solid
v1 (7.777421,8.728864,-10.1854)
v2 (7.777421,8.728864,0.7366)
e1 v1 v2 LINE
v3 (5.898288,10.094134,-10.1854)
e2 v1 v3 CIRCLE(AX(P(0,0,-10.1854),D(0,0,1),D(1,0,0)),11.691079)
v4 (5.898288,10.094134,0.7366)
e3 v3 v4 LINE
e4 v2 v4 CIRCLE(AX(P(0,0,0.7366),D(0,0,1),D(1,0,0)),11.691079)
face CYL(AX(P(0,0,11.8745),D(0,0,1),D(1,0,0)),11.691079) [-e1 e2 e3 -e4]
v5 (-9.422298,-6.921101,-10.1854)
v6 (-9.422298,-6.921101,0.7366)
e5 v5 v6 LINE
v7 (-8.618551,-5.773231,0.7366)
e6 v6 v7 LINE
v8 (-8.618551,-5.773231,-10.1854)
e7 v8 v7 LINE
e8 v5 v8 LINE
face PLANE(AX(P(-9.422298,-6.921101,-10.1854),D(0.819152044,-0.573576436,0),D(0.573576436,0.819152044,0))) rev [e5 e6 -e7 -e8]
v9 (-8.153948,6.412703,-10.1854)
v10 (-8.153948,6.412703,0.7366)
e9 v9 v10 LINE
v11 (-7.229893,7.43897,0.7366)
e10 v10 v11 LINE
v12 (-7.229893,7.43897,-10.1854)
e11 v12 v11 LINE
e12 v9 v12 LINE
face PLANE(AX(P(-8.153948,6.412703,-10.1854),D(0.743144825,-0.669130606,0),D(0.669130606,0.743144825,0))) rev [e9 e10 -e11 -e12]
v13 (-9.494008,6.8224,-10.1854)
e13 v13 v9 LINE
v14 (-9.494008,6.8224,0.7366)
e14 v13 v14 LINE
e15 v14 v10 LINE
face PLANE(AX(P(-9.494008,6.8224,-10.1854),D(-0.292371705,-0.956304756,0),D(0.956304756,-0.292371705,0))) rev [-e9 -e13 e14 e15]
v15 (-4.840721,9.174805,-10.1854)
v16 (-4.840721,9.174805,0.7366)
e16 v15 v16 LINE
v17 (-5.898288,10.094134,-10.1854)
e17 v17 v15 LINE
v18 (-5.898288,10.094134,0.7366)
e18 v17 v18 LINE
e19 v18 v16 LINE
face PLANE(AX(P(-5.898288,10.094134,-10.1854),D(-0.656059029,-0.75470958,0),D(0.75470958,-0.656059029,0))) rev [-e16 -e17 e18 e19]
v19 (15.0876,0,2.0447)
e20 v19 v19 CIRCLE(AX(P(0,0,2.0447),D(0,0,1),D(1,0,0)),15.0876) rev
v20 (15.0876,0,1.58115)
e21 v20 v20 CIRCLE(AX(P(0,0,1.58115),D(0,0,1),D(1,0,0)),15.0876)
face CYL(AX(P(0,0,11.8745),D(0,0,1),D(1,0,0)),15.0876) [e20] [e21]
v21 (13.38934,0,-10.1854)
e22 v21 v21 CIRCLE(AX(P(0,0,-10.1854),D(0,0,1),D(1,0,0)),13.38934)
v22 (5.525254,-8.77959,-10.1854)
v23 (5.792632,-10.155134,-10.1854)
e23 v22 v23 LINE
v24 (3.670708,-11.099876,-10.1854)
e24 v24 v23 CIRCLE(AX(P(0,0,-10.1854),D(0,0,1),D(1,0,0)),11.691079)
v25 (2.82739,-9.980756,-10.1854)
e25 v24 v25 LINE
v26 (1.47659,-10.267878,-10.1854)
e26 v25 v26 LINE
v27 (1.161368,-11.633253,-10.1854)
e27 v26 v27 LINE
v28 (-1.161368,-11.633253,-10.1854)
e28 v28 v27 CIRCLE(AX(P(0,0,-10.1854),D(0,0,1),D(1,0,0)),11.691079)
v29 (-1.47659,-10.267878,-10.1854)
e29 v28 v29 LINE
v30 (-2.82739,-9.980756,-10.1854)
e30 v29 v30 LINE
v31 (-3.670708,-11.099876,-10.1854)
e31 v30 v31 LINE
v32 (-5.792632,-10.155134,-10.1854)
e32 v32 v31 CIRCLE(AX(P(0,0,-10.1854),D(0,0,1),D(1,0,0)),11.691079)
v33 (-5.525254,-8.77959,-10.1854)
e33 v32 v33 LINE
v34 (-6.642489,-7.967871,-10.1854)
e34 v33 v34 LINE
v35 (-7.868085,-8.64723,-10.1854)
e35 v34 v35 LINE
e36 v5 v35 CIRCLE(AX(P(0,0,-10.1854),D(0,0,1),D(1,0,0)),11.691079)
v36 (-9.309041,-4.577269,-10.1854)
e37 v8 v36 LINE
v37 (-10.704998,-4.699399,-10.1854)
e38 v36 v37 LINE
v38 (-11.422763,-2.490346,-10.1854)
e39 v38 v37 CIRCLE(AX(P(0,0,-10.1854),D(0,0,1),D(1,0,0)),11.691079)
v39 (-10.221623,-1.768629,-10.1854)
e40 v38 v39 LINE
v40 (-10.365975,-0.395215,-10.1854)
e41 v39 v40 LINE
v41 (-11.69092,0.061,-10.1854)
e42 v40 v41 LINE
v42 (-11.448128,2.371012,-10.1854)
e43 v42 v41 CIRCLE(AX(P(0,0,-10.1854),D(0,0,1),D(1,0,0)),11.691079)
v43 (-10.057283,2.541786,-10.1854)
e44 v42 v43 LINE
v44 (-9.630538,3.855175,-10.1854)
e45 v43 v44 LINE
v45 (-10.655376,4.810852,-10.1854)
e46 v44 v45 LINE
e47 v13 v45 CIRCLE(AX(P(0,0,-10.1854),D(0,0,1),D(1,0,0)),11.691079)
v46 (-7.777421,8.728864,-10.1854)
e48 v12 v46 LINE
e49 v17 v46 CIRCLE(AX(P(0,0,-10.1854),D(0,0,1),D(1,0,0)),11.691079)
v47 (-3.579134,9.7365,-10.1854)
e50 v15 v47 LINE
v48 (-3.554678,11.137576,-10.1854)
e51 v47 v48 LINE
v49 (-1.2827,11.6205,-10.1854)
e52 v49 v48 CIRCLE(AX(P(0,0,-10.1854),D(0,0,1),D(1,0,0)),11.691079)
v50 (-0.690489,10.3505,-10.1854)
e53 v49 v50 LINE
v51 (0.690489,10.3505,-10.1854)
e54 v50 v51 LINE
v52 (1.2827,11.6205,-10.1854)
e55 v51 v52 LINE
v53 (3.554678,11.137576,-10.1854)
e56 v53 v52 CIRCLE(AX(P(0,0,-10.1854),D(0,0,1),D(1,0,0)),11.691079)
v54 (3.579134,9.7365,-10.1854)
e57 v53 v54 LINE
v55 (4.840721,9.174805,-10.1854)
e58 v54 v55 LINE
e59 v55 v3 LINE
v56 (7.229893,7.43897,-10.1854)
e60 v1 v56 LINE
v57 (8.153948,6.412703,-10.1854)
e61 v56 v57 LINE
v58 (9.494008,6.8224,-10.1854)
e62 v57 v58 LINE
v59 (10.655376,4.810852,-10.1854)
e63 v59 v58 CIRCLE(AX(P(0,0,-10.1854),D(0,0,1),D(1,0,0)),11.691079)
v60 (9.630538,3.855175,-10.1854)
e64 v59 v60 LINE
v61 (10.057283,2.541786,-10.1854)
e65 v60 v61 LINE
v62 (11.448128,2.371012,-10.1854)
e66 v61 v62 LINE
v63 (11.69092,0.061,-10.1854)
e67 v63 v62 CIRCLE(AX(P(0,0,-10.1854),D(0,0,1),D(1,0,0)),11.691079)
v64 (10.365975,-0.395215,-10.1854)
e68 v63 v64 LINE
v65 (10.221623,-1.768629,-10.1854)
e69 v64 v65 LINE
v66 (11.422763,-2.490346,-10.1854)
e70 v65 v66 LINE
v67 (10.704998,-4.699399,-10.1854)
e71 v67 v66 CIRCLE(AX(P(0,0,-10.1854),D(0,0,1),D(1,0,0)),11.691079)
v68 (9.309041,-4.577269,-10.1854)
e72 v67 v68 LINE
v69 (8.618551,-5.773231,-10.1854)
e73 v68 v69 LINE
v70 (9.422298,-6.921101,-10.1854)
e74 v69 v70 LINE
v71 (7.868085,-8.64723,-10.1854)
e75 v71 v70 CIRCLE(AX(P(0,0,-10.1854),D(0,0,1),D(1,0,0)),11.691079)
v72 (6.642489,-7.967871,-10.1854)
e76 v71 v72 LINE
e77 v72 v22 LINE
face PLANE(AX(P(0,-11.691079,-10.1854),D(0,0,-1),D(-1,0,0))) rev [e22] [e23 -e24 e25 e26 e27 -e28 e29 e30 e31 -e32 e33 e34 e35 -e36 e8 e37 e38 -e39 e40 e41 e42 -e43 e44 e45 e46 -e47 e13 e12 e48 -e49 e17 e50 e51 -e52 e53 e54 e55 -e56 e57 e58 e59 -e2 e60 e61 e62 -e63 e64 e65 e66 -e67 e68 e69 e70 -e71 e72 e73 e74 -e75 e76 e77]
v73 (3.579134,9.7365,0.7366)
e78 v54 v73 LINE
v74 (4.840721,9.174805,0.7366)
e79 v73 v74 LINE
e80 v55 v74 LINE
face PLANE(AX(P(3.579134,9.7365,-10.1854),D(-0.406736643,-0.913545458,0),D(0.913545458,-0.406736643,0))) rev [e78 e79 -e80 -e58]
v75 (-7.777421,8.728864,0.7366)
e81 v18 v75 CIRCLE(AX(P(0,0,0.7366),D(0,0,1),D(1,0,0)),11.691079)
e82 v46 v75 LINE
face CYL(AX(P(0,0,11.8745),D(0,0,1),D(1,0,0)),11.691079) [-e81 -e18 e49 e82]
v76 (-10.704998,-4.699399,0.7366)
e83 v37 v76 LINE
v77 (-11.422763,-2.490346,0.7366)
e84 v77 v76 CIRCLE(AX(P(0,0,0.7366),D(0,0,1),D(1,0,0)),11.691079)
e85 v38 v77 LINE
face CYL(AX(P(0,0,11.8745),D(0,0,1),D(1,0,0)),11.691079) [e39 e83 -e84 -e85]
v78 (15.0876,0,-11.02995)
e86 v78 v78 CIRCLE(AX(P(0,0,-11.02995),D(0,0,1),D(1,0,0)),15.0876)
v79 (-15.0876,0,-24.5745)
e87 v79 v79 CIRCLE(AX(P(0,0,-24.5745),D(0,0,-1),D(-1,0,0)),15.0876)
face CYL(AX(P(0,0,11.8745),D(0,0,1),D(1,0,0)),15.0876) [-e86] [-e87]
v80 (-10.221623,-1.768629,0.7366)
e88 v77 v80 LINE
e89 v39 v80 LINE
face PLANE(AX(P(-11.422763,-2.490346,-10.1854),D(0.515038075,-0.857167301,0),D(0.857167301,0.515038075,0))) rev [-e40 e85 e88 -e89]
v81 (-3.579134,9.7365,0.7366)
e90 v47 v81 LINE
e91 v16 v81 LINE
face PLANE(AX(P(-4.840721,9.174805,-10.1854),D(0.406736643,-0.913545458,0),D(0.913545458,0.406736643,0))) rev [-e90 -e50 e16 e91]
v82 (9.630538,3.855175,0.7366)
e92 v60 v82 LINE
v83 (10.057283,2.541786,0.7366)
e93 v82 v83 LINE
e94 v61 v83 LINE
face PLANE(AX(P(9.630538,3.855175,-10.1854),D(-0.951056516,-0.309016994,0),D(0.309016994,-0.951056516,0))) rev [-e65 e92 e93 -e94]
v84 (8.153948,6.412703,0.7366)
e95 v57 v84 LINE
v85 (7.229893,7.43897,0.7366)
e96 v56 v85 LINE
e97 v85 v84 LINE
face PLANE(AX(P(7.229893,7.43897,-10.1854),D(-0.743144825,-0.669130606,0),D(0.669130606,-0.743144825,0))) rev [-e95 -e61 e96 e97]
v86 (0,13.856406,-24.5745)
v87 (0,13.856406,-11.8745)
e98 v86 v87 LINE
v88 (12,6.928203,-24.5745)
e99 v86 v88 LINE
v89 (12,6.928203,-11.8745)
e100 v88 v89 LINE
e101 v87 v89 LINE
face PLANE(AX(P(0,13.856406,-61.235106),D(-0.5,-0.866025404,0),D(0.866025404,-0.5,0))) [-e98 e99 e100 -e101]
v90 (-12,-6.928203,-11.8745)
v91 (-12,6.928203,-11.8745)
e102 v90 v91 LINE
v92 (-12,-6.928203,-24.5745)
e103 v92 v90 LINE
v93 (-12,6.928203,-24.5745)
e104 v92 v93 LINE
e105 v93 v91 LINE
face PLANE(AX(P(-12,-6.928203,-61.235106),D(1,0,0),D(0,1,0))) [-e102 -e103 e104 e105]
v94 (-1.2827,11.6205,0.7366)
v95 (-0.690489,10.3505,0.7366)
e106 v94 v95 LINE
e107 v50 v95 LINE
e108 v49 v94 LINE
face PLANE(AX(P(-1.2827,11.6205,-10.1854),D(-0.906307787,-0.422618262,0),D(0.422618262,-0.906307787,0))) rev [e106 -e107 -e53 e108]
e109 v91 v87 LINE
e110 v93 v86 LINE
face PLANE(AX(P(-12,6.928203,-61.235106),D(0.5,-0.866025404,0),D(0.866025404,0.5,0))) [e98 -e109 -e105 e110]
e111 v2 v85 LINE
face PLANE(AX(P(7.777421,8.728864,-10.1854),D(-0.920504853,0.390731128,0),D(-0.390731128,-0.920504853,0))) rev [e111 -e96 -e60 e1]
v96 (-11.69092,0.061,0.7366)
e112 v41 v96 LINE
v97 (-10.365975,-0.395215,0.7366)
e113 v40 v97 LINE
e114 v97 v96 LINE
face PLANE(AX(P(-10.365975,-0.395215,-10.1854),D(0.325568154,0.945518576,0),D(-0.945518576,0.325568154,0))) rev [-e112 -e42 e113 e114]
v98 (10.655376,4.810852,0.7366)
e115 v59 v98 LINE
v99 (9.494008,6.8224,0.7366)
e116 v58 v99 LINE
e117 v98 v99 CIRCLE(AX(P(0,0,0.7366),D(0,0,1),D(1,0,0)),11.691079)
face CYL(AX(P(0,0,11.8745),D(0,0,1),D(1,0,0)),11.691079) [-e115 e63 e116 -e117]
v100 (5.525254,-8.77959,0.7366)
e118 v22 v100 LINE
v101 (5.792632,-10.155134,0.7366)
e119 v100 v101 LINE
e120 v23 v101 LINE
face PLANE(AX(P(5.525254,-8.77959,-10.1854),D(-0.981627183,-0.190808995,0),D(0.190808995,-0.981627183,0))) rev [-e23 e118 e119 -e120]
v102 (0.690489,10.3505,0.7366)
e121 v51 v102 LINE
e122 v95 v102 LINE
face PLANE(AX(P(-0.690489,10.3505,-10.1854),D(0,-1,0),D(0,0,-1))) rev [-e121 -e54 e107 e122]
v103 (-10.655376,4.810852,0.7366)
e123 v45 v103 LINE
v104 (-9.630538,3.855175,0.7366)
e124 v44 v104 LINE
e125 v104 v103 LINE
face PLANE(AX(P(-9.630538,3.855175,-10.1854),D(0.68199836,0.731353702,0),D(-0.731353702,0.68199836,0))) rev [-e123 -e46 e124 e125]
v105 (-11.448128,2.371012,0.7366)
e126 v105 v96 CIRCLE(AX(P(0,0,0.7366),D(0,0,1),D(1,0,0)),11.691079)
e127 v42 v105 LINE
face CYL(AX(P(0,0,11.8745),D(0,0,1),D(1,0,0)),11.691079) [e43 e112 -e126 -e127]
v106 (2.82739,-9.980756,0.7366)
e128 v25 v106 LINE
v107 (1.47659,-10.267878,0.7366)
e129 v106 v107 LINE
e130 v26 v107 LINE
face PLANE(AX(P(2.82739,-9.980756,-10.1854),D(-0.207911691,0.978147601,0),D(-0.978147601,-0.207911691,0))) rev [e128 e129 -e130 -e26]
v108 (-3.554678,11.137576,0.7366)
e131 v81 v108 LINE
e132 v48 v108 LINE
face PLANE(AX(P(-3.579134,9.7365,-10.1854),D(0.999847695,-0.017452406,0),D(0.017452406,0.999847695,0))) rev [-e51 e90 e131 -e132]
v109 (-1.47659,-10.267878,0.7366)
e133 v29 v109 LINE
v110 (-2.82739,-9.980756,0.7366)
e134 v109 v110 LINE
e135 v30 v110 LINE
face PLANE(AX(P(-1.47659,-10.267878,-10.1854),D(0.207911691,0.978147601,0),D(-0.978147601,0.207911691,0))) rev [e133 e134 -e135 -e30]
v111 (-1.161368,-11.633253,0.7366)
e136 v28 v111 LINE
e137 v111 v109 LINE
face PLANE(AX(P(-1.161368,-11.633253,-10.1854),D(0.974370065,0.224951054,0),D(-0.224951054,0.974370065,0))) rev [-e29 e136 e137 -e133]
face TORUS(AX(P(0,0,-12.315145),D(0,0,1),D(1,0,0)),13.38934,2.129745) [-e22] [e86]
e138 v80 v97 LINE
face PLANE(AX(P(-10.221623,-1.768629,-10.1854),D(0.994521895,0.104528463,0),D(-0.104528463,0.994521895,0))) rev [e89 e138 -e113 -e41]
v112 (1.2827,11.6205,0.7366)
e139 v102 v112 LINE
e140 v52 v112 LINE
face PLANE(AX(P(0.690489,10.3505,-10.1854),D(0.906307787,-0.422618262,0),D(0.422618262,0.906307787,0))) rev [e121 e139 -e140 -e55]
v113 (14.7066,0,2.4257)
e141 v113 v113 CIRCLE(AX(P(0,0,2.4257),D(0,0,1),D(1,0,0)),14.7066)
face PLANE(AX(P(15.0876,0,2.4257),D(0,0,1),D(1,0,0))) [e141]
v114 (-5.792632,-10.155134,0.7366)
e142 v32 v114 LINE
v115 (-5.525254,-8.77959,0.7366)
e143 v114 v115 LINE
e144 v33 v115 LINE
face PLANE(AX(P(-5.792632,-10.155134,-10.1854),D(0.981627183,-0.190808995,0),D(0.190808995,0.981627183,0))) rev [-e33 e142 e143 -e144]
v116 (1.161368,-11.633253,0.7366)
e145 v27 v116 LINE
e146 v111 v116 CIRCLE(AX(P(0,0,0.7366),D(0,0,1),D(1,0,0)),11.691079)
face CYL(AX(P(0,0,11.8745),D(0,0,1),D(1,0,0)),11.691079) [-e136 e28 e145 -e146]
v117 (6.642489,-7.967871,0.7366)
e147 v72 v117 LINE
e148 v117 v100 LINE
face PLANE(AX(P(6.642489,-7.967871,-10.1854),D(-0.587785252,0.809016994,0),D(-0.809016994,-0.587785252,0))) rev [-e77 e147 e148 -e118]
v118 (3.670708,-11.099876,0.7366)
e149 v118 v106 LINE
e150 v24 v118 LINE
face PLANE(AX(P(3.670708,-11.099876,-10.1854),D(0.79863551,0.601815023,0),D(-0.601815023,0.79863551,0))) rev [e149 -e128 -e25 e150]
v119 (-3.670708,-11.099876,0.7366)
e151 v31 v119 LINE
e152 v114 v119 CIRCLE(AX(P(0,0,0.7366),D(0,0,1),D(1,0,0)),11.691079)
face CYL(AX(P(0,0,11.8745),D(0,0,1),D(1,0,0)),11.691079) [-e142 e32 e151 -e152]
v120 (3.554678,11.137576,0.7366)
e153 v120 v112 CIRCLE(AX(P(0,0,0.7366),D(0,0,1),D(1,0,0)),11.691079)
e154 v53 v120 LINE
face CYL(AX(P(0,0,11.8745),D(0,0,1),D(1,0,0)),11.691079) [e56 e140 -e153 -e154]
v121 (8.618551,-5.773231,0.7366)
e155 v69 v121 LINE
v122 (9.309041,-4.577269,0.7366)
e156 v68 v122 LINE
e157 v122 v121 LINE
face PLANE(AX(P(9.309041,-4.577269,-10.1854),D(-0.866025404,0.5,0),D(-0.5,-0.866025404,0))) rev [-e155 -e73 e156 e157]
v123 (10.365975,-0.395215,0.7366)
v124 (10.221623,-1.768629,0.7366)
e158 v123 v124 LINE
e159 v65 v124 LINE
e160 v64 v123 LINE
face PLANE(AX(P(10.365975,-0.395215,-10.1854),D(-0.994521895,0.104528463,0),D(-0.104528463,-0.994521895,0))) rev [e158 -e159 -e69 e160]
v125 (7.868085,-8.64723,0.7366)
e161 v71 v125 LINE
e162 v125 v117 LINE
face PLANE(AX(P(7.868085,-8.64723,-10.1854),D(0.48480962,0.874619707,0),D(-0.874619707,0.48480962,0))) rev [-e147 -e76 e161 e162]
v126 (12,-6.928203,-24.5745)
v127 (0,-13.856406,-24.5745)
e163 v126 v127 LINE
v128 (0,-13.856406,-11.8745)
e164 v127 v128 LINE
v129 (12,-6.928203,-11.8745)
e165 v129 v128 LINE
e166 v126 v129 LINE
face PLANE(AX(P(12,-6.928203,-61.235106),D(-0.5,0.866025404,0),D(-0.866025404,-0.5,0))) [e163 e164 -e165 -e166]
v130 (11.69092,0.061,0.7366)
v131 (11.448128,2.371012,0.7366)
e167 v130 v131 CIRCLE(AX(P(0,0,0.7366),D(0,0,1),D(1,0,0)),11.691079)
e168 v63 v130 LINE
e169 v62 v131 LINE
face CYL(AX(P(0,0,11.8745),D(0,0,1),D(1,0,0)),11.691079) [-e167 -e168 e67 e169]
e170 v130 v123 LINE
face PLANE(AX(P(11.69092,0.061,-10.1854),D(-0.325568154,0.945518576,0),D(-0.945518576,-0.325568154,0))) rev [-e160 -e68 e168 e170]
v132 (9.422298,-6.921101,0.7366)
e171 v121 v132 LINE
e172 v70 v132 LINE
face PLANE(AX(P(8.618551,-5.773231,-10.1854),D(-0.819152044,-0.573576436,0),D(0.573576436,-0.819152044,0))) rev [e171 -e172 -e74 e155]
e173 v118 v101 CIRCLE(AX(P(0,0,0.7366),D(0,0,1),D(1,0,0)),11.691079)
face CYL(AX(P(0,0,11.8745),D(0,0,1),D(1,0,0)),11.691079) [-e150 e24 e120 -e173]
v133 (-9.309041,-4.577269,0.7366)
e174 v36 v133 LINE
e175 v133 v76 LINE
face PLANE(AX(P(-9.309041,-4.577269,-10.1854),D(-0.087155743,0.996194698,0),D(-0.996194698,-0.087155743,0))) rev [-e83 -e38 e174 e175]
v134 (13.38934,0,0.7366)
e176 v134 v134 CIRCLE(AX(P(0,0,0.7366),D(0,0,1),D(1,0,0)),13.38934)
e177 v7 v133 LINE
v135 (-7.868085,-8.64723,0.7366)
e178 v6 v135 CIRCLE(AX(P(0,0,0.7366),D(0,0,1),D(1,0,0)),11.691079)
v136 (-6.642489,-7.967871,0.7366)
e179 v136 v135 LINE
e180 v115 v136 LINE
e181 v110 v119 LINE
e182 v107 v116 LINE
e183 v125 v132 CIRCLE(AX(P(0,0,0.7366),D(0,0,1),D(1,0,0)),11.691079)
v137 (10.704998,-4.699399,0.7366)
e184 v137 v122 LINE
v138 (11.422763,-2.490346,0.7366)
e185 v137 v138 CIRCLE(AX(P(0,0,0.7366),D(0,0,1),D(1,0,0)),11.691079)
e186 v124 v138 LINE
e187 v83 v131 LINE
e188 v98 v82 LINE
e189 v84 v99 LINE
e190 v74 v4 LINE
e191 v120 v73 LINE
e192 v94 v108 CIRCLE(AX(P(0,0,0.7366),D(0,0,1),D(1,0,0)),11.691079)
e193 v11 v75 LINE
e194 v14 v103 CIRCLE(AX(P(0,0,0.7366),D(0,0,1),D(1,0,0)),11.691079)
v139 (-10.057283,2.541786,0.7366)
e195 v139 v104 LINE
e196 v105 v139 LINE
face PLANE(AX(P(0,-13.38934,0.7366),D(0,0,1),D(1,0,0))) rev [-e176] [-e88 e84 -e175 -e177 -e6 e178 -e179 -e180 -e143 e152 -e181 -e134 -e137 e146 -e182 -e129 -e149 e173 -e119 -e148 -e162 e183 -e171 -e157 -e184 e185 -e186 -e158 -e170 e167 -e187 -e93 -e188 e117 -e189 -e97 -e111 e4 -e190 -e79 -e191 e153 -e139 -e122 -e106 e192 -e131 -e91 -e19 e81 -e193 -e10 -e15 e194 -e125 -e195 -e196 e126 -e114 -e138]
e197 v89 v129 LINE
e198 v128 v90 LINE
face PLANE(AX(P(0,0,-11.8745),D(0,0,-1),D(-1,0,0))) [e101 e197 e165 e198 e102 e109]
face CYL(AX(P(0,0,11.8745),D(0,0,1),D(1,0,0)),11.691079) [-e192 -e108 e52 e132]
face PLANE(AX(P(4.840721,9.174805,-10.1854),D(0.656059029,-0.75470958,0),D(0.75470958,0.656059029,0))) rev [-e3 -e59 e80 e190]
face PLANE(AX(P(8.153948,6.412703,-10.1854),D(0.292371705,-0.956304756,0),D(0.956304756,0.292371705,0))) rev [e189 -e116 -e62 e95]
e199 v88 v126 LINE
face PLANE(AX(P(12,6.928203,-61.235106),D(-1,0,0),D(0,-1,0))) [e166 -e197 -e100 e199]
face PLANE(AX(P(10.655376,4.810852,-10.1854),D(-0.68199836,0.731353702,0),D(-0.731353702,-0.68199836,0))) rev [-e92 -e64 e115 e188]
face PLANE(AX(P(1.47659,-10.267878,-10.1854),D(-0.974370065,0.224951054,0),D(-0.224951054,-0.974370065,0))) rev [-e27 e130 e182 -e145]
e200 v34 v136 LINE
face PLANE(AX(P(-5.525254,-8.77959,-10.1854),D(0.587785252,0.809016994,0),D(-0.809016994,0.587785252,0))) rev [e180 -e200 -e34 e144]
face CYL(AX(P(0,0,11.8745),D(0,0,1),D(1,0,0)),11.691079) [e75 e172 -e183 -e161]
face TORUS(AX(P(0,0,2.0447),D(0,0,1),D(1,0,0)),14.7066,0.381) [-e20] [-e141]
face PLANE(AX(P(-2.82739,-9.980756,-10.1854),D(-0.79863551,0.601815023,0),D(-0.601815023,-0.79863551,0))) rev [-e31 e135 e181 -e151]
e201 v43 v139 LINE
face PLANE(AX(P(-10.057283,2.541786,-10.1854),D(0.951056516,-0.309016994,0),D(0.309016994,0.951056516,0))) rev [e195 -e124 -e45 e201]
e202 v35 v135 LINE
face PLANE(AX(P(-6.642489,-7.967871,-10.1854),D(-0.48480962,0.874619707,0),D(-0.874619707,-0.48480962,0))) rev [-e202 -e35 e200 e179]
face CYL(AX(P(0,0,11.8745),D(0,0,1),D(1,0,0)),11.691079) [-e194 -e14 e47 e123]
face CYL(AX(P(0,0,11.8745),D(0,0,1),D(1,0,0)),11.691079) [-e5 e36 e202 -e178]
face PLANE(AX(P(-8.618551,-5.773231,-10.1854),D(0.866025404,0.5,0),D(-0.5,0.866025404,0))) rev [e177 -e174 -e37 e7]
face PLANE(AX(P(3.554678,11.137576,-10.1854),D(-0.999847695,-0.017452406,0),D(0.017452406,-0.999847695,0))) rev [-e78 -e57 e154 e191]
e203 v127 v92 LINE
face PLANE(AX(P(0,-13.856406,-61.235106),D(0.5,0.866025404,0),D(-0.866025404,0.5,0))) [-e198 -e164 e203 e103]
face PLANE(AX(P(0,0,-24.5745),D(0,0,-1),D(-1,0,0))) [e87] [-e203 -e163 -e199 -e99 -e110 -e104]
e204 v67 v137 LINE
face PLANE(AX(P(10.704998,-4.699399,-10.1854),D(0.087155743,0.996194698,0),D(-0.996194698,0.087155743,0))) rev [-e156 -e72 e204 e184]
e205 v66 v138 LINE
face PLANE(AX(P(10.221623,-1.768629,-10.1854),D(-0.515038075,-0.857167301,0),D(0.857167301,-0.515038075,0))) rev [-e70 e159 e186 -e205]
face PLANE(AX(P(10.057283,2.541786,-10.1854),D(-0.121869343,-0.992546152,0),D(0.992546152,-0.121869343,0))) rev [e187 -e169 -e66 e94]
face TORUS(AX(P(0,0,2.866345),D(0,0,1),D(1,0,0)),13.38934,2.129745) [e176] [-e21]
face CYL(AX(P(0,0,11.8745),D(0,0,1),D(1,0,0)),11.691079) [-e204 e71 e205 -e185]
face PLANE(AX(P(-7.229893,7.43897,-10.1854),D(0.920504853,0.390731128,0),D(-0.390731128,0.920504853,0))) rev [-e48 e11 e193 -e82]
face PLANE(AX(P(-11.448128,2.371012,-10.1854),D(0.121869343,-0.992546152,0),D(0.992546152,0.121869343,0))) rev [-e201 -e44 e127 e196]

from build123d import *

# Parameters (mm, degrees)
CUT_EXTRUDE1_START  = 0.7366
CUT_EXTRUDE1_DEPTH  = 10.922
CIRPATTERN1_COUNT   = 15
FILLET1_R           = 0.381
SKETCH7_R           = 15.0876
BOSS_EXTRUDE1_DEPTH = 12.7
CUT_EXTRUDE3_DEPTH  = 12.7


# Read off the part's stored shape, not the designer's step: Split1
with BuildPart() as part:
    # Sketch2 → Revolve1 (revolve)
    with BuildSketch(Plane(origin=(0, 0, 0), x_dir=(0, 0, -1), z_dir=(1, 0, 0)), mode=Mode.PRIVATE) as revolve1_sk:
        with BuildLine():
            Line((-11.8745, 0), (11.8745, 0))
            Line((11.8745, 0), (11.8745, 15.0876))
            Line((11.8745, 15.0876), (11.02995, 15.0876))
            ThreePointArc((11.02995, 15.0876), (10.408190439, 14.337674152), (10.1854, 13.389339743))
            Line((10.1854, 13.389339743), (10.1854, 11.691079486))
            Line((10.1854, 11.691079486), (-0.7366, 11.691079486))
            Line((-0.7366, 11.691079486), (-0.7366, 13.389339743))
            ThreePointArc((-0.7366, 13.389339743), (-0.959390439, 14.337674152), (-1.58115, 15.0876))
            Line((-1.58115, 15.0876), (-2.4257, 15.0876))
            Line((-2.4257, 15.0876), (-2.4257, 7.9375))
            Line((-2.4257, 7.9375), (-11.8745, 7.9375))
            Line((-11.8745, 7.9375), (-11.8745, 0))
        make_face()
    revolve(revolve1_sk.sketch.rotate(Axis((0, 0, 11.8745), (0, 0, -1)), 90), axis=Axis((0, 0, 11.8745), (0, 0, -1)))

    # Sketch3 → Cut-Extrude1 (cut)
    with BuildSketch(Plane.XY.offset(CUT_EXTRUDE1_START)):
        with BuildLine():
            Line((-0.690489274, 10.3505), (0.690489274, 10.3505))
            Line((0.690489274, 10.3505), (1.2827, 11.6205))
            ThreePointArc((1.2827, 11.6205), (0, 11.691079486), (-1.2827, 11.6205))
            Line((-1.2827, 11.6205), (-0.690489274, 10.3505))
        make_face()
    cut_extrude1 = extrude(amount=-CUT_EXTRUDE1_DEPTH, mode=Mode.SUBTRACT)

    # CirPattern1: Cut-Extrude1 ×15 about axis
    cirpattern1_axis = Axis((0, 0, 0), (0, 0, 1))
    for i in range(1, CIRPATTERN1_COUNT):
        add(cut_extrude1.rotate(cirpattern1_axis, i * 360 / CIRPATTERN1_COUNT), mode=Mode.SUBTRACT)


with BuildPart() as body_2:
    # Split1: the piece on the far side of the plane
    add(part.part)
    split(bisect_by=Plane.XY.offset(2.4257), keep=Keep.BOTTOM)

    # Fillet1
    fillet1_edges = [body_2.edges().sort_by_distance(p)[0] for p in [
        (-15.0876, 0, 2.4257),
    ]]
    fillet(fillet1_edges, radius=FILLET1_R)

    # Sketch7 → Boss-Extrude1 (add)
    with BuildSketch(Plane(origin=(0, 0, -11.8745), x_dir=(-1, 0, 0), z_dir=(0, 0, -1))):
        with Locations(Location((0, 0, 0), (0, 0, 180))):
            Circle(SKETCH7_R)
    extrude(amount=BOSS_EXTRUDE1_DEPTH)

    # Sketch6 → Cut-Extrude3 (cut)
    with BuildSketch(Plane(origin=(0, 0, -11.8745), x_dir=(-1, 0, 0), z_dir=(0, 0, -1))):
        Polygon((-12, 6.92820323), (-12, -6.92820323), (0, -13.856406461), (12, -6.92820323), (12, 6.92820323), (0, 13.856406461), align=None)
    extrude(amount=CUT_EXTRUDE3_DEPTH, mode=Mode.SUBTRACT)


with BuildPart() as part_1:
    add(part.part)

    # Split1
    split(bisect_by=Plane.XY.offset(2.4257), keep=Keep.TOP)


solid = body_2.part
